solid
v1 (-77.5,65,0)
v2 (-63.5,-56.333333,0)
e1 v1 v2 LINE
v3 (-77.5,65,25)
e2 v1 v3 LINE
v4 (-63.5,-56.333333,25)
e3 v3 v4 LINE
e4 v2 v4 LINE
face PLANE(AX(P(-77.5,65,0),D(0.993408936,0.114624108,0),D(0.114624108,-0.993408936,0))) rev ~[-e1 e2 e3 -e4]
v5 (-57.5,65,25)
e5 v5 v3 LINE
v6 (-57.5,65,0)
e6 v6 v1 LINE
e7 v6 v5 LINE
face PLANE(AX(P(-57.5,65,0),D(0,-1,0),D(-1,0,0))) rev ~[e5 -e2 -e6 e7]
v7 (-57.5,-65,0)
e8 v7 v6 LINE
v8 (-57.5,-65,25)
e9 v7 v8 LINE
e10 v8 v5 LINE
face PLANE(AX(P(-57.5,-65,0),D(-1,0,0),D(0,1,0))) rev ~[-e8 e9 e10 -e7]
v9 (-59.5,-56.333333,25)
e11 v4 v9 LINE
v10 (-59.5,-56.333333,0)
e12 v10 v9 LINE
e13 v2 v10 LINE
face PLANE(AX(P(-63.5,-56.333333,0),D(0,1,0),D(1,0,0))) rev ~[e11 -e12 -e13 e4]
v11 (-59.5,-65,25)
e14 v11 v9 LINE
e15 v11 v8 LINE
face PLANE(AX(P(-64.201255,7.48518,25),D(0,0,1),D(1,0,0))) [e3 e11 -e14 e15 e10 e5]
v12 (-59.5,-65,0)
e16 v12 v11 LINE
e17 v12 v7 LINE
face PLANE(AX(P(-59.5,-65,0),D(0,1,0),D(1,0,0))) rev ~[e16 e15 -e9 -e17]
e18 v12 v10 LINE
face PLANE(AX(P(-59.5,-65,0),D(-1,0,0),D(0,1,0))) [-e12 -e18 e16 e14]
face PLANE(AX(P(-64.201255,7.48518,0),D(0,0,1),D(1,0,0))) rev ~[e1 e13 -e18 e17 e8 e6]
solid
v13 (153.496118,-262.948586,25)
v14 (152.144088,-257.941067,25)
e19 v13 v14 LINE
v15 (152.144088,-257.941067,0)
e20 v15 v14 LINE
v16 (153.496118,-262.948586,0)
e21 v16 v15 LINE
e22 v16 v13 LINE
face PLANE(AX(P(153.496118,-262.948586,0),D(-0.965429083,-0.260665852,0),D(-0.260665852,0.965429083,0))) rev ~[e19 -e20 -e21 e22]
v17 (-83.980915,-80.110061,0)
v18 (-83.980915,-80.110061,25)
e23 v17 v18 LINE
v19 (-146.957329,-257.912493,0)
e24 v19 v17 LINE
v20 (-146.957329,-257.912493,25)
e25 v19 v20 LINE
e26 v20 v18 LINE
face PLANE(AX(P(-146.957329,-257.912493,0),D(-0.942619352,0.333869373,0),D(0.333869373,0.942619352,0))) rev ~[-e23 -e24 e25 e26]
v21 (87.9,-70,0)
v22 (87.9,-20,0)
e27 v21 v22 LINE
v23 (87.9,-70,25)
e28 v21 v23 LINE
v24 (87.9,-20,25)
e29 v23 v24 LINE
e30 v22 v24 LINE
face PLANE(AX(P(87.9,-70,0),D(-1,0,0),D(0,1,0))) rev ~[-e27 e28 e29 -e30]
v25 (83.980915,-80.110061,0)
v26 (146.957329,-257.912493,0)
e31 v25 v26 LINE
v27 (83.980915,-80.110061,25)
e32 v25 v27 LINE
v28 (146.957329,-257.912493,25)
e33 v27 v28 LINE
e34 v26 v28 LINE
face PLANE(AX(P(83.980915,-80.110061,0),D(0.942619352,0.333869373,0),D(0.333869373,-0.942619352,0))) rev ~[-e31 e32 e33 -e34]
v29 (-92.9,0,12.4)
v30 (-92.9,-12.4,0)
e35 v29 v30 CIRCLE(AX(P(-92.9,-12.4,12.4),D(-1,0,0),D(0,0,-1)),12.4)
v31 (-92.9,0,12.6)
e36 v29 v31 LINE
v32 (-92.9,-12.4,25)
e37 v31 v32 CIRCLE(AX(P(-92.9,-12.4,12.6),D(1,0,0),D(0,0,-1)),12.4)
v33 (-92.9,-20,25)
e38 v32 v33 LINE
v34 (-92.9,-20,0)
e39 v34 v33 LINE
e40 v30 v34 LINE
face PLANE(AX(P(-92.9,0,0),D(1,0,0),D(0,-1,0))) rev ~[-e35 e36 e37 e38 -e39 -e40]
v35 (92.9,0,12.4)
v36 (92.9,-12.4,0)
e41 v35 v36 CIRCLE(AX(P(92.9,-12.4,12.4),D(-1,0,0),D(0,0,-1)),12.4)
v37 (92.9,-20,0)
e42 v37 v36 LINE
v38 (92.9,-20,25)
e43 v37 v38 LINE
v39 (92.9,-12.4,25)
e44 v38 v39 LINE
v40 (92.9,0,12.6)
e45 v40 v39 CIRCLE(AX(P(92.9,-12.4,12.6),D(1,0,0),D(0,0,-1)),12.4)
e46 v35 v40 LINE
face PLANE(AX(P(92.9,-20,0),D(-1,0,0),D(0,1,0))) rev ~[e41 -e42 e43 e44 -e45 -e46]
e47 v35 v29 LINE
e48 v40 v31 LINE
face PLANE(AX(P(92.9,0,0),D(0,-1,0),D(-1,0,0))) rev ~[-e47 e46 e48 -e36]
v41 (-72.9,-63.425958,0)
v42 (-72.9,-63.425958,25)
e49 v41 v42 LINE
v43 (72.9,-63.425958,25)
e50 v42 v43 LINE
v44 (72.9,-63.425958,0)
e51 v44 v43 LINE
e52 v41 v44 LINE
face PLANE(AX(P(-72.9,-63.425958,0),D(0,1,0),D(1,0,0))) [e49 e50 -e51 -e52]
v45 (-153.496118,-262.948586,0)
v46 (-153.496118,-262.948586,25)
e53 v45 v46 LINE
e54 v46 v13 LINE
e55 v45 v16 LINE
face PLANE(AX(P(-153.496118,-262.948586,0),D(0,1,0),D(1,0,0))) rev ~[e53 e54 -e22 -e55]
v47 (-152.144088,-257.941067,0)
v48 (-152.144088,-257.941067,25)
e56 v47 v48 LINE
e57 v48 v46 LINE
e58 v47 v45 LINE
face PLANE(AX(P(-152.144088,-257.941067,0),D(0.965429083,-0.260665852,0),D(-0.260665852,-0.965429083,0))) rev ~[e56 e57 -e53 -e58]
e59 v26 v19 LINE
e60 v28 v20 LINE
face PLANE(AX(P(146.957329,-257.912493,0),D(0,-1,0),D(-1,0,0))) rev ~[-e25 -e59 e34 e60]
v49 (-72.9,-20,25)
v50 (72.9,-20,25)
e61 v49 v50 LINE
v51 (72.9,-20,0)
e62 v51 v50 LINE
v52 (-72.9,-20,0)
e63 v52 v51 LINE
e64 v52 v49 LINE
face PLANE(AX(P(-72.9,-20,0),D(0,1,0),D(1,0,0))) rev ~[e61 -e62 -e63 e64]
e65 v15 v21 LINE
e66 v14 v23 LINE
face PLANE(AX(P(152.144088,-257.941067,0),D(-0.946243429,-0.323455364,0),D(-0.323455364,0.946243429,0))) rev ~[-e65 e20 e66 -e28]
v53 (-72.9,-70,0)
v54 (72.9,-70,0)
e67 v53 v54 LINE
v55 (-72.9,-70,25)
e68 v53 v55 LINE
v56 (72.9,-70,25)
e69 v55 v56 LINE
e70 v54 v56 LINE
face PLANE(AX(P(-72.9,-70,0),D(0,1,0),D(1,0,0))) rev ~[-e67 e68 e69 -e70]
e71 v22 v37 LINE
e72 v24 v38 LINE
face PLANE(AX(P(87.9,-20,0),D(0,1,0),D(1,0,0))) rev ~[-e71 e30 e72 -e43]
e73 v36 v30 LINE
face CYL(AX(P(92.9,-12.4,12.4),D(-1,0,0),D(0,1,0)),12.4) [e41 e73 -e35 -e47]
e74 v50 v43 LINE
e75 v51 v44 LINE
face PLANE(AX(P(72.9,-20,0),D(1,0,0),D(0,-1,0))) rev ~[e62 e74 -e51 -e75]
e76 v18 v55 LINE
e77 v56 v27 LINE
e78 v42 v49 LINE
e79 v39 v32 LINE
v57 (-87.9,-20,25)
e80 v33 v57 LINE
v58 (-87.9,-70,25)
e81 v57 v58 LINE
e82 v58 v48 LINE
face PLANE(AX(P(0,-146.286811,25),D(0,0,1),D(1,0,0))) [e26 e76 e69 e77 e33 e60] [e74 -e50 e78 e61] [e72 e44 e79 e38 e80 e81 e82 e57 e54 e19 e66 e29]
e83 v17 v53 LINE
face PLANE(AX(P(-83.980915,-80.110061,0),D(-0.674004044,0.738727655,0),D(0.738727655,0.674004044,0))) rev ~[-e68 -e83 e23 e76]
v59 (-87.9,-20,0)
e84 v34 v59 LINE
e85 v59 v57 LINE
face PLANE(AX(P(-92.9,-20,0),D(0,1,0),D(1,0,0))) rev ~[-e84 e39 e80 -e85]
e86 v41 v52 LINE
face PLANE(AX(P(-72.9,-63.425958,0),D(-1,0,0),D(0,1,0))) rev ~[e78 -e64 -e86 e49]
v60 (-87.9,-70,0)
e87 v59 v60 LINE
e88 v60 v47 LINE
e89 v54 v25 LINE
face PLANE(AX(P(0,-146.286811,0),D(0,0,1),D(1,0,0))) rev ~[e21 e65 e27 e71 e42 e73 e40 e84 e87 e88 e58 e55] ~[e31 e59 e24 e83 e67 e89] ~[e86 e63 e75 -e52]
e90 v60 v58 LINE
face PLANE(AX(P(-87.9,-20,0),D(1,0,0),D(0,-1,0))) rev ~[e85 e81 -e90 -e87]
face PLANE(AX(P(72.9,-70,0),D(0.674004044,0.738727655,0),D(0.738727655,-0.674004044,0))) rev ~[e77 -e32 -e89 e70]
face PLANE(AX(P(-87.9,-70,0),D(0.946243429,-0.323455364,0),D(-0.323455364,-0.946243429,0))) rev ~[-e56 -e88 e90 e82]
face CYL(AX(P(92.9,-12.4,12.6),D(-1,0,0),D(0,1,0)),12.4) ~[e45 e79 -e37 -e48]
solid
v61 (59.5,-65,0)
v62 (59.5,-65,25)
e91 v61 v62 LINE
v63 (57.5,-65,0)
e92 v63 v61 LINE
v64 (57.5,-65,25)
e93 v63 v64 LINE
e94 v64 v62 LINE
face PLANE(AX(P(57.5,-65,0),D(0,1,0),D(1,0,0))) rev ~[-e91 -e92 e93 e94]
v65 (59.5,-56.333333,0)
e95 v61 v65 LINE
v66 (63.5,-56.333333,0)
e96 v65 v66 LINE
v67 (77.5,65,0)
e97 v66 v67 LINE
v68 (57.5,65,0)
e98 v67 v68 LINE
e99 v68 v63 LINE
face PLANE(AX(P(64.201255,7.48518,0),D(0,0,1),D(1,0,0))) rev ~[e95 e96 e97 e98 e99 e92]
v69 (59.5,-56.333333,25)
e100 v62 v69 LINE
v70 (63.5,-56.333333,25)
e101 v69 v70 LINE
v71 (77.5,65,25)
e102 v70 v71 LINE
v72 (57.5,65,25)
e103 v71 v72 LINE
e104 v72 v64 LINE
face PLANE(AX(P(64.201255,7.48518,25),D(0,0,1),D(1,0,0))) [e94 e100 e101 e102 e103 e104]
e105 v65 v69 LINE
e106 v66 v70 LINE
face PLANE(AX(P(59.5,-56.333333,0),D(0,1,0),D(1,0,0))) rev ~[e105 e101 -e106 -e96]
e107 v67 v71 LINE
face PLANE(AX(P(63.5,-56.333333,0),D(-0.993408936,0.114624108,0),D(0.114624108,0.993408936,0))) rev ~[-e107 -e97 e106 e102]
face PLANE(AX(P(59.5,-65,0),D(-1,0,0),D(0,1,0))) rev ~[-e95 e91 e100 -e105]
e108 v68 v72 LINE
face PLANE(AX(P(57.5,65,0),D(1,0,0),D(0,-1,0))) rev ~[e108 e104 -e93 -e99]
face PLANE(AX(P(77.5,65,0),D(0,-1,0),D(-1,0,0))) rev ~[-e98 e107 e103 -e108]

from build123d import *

# Parameters (mm, degrees)
F0_W     = 145.8
F0_H     = 6.5740418434
F1_DEPTH = 25
F2_W     = 2
F2_H     = 8.6666666667
F3_DEPTH = 25
F4_R     = 12.4


# Not quite as in the source:
# - a feature names something its author has since deleted; it is built from what else it names


with BuildPart() as f1:
    # F0 (on Top) → F1 (new body)
    with BuildSketch(Plane.XY):
        Polygon((153.4961182735, -262.9485861983), (152.1440880223, -257.9410667492), (87.9, -70), (87.9, -20), (92.9, -20), (92.9, 0), (88.236759305, 0), (-88.236759305, 0), (-92.9, 0), (-92.9, -20), (-87.9, -20), (-87.9, -70), (-152.1440880223, -257.9410667492), (-153.4961182735, -262.9485861983), align=None)
        Polygon((83.9809148248, -80.1100606648), (146.9573287566, -257.9124928518), (-146.9573287566, -257.9124928518), (-83.9809148248, -80.1100606648), (-72.9, -70), (-72.9, -63.4259581566), (-72.9, -20), (72.9, -20), (72.9, -63.4259581566), (72.9, -70), align=None, mode=Mode.SUBTRACT)
        with Locations((0, -66.7129790783)):
            Rectangle(F0_W, F0_H)
    extrude(amount=F1_DEPTH)

    # F4
    f4_edges = [f1.edges().sort_by_distance(p)[0] for p in [
        (0, 0, 25),
        (0, 0, 0),
    ]]
    fillet(f4_edges, radius=F4_R)


with BuildPart() as f3:
    # F2 (on Top) → F3 (new body)
    with BuildSketch(Plane.XY):
        Polygon((-57.5, -56.3333333333), (-57.5, 0), (-57.5, 65), (-77.5, 65), (-63.5, -56.3333333333), (-59.5, -56.3333333333), align=None)
        with Locations((-58.5, -60.6666666667)):
            Rectangle(F2_W, F2_H)
    extrude(amount=F3_DEPTH)


with BuildPart() as f3b:
    # F2 (on Top) → F3, piece 2 (new body)
    with BuildSketch(Plane.XY):
        Polygon((57.5, 65), (57.5, 0), (57.5, -56.3333333333), (59.5, -56.3333333333), (63.5, -56.3333333333), (77.5, 65), align=None)
        with Locations((58.5, -60.6666666667)):
            Rectangle(F2_W, F2_H)
    extrude(amount=F3_DEPTH)


solid = Compound([f1.part, f3.part, f3b.part])
